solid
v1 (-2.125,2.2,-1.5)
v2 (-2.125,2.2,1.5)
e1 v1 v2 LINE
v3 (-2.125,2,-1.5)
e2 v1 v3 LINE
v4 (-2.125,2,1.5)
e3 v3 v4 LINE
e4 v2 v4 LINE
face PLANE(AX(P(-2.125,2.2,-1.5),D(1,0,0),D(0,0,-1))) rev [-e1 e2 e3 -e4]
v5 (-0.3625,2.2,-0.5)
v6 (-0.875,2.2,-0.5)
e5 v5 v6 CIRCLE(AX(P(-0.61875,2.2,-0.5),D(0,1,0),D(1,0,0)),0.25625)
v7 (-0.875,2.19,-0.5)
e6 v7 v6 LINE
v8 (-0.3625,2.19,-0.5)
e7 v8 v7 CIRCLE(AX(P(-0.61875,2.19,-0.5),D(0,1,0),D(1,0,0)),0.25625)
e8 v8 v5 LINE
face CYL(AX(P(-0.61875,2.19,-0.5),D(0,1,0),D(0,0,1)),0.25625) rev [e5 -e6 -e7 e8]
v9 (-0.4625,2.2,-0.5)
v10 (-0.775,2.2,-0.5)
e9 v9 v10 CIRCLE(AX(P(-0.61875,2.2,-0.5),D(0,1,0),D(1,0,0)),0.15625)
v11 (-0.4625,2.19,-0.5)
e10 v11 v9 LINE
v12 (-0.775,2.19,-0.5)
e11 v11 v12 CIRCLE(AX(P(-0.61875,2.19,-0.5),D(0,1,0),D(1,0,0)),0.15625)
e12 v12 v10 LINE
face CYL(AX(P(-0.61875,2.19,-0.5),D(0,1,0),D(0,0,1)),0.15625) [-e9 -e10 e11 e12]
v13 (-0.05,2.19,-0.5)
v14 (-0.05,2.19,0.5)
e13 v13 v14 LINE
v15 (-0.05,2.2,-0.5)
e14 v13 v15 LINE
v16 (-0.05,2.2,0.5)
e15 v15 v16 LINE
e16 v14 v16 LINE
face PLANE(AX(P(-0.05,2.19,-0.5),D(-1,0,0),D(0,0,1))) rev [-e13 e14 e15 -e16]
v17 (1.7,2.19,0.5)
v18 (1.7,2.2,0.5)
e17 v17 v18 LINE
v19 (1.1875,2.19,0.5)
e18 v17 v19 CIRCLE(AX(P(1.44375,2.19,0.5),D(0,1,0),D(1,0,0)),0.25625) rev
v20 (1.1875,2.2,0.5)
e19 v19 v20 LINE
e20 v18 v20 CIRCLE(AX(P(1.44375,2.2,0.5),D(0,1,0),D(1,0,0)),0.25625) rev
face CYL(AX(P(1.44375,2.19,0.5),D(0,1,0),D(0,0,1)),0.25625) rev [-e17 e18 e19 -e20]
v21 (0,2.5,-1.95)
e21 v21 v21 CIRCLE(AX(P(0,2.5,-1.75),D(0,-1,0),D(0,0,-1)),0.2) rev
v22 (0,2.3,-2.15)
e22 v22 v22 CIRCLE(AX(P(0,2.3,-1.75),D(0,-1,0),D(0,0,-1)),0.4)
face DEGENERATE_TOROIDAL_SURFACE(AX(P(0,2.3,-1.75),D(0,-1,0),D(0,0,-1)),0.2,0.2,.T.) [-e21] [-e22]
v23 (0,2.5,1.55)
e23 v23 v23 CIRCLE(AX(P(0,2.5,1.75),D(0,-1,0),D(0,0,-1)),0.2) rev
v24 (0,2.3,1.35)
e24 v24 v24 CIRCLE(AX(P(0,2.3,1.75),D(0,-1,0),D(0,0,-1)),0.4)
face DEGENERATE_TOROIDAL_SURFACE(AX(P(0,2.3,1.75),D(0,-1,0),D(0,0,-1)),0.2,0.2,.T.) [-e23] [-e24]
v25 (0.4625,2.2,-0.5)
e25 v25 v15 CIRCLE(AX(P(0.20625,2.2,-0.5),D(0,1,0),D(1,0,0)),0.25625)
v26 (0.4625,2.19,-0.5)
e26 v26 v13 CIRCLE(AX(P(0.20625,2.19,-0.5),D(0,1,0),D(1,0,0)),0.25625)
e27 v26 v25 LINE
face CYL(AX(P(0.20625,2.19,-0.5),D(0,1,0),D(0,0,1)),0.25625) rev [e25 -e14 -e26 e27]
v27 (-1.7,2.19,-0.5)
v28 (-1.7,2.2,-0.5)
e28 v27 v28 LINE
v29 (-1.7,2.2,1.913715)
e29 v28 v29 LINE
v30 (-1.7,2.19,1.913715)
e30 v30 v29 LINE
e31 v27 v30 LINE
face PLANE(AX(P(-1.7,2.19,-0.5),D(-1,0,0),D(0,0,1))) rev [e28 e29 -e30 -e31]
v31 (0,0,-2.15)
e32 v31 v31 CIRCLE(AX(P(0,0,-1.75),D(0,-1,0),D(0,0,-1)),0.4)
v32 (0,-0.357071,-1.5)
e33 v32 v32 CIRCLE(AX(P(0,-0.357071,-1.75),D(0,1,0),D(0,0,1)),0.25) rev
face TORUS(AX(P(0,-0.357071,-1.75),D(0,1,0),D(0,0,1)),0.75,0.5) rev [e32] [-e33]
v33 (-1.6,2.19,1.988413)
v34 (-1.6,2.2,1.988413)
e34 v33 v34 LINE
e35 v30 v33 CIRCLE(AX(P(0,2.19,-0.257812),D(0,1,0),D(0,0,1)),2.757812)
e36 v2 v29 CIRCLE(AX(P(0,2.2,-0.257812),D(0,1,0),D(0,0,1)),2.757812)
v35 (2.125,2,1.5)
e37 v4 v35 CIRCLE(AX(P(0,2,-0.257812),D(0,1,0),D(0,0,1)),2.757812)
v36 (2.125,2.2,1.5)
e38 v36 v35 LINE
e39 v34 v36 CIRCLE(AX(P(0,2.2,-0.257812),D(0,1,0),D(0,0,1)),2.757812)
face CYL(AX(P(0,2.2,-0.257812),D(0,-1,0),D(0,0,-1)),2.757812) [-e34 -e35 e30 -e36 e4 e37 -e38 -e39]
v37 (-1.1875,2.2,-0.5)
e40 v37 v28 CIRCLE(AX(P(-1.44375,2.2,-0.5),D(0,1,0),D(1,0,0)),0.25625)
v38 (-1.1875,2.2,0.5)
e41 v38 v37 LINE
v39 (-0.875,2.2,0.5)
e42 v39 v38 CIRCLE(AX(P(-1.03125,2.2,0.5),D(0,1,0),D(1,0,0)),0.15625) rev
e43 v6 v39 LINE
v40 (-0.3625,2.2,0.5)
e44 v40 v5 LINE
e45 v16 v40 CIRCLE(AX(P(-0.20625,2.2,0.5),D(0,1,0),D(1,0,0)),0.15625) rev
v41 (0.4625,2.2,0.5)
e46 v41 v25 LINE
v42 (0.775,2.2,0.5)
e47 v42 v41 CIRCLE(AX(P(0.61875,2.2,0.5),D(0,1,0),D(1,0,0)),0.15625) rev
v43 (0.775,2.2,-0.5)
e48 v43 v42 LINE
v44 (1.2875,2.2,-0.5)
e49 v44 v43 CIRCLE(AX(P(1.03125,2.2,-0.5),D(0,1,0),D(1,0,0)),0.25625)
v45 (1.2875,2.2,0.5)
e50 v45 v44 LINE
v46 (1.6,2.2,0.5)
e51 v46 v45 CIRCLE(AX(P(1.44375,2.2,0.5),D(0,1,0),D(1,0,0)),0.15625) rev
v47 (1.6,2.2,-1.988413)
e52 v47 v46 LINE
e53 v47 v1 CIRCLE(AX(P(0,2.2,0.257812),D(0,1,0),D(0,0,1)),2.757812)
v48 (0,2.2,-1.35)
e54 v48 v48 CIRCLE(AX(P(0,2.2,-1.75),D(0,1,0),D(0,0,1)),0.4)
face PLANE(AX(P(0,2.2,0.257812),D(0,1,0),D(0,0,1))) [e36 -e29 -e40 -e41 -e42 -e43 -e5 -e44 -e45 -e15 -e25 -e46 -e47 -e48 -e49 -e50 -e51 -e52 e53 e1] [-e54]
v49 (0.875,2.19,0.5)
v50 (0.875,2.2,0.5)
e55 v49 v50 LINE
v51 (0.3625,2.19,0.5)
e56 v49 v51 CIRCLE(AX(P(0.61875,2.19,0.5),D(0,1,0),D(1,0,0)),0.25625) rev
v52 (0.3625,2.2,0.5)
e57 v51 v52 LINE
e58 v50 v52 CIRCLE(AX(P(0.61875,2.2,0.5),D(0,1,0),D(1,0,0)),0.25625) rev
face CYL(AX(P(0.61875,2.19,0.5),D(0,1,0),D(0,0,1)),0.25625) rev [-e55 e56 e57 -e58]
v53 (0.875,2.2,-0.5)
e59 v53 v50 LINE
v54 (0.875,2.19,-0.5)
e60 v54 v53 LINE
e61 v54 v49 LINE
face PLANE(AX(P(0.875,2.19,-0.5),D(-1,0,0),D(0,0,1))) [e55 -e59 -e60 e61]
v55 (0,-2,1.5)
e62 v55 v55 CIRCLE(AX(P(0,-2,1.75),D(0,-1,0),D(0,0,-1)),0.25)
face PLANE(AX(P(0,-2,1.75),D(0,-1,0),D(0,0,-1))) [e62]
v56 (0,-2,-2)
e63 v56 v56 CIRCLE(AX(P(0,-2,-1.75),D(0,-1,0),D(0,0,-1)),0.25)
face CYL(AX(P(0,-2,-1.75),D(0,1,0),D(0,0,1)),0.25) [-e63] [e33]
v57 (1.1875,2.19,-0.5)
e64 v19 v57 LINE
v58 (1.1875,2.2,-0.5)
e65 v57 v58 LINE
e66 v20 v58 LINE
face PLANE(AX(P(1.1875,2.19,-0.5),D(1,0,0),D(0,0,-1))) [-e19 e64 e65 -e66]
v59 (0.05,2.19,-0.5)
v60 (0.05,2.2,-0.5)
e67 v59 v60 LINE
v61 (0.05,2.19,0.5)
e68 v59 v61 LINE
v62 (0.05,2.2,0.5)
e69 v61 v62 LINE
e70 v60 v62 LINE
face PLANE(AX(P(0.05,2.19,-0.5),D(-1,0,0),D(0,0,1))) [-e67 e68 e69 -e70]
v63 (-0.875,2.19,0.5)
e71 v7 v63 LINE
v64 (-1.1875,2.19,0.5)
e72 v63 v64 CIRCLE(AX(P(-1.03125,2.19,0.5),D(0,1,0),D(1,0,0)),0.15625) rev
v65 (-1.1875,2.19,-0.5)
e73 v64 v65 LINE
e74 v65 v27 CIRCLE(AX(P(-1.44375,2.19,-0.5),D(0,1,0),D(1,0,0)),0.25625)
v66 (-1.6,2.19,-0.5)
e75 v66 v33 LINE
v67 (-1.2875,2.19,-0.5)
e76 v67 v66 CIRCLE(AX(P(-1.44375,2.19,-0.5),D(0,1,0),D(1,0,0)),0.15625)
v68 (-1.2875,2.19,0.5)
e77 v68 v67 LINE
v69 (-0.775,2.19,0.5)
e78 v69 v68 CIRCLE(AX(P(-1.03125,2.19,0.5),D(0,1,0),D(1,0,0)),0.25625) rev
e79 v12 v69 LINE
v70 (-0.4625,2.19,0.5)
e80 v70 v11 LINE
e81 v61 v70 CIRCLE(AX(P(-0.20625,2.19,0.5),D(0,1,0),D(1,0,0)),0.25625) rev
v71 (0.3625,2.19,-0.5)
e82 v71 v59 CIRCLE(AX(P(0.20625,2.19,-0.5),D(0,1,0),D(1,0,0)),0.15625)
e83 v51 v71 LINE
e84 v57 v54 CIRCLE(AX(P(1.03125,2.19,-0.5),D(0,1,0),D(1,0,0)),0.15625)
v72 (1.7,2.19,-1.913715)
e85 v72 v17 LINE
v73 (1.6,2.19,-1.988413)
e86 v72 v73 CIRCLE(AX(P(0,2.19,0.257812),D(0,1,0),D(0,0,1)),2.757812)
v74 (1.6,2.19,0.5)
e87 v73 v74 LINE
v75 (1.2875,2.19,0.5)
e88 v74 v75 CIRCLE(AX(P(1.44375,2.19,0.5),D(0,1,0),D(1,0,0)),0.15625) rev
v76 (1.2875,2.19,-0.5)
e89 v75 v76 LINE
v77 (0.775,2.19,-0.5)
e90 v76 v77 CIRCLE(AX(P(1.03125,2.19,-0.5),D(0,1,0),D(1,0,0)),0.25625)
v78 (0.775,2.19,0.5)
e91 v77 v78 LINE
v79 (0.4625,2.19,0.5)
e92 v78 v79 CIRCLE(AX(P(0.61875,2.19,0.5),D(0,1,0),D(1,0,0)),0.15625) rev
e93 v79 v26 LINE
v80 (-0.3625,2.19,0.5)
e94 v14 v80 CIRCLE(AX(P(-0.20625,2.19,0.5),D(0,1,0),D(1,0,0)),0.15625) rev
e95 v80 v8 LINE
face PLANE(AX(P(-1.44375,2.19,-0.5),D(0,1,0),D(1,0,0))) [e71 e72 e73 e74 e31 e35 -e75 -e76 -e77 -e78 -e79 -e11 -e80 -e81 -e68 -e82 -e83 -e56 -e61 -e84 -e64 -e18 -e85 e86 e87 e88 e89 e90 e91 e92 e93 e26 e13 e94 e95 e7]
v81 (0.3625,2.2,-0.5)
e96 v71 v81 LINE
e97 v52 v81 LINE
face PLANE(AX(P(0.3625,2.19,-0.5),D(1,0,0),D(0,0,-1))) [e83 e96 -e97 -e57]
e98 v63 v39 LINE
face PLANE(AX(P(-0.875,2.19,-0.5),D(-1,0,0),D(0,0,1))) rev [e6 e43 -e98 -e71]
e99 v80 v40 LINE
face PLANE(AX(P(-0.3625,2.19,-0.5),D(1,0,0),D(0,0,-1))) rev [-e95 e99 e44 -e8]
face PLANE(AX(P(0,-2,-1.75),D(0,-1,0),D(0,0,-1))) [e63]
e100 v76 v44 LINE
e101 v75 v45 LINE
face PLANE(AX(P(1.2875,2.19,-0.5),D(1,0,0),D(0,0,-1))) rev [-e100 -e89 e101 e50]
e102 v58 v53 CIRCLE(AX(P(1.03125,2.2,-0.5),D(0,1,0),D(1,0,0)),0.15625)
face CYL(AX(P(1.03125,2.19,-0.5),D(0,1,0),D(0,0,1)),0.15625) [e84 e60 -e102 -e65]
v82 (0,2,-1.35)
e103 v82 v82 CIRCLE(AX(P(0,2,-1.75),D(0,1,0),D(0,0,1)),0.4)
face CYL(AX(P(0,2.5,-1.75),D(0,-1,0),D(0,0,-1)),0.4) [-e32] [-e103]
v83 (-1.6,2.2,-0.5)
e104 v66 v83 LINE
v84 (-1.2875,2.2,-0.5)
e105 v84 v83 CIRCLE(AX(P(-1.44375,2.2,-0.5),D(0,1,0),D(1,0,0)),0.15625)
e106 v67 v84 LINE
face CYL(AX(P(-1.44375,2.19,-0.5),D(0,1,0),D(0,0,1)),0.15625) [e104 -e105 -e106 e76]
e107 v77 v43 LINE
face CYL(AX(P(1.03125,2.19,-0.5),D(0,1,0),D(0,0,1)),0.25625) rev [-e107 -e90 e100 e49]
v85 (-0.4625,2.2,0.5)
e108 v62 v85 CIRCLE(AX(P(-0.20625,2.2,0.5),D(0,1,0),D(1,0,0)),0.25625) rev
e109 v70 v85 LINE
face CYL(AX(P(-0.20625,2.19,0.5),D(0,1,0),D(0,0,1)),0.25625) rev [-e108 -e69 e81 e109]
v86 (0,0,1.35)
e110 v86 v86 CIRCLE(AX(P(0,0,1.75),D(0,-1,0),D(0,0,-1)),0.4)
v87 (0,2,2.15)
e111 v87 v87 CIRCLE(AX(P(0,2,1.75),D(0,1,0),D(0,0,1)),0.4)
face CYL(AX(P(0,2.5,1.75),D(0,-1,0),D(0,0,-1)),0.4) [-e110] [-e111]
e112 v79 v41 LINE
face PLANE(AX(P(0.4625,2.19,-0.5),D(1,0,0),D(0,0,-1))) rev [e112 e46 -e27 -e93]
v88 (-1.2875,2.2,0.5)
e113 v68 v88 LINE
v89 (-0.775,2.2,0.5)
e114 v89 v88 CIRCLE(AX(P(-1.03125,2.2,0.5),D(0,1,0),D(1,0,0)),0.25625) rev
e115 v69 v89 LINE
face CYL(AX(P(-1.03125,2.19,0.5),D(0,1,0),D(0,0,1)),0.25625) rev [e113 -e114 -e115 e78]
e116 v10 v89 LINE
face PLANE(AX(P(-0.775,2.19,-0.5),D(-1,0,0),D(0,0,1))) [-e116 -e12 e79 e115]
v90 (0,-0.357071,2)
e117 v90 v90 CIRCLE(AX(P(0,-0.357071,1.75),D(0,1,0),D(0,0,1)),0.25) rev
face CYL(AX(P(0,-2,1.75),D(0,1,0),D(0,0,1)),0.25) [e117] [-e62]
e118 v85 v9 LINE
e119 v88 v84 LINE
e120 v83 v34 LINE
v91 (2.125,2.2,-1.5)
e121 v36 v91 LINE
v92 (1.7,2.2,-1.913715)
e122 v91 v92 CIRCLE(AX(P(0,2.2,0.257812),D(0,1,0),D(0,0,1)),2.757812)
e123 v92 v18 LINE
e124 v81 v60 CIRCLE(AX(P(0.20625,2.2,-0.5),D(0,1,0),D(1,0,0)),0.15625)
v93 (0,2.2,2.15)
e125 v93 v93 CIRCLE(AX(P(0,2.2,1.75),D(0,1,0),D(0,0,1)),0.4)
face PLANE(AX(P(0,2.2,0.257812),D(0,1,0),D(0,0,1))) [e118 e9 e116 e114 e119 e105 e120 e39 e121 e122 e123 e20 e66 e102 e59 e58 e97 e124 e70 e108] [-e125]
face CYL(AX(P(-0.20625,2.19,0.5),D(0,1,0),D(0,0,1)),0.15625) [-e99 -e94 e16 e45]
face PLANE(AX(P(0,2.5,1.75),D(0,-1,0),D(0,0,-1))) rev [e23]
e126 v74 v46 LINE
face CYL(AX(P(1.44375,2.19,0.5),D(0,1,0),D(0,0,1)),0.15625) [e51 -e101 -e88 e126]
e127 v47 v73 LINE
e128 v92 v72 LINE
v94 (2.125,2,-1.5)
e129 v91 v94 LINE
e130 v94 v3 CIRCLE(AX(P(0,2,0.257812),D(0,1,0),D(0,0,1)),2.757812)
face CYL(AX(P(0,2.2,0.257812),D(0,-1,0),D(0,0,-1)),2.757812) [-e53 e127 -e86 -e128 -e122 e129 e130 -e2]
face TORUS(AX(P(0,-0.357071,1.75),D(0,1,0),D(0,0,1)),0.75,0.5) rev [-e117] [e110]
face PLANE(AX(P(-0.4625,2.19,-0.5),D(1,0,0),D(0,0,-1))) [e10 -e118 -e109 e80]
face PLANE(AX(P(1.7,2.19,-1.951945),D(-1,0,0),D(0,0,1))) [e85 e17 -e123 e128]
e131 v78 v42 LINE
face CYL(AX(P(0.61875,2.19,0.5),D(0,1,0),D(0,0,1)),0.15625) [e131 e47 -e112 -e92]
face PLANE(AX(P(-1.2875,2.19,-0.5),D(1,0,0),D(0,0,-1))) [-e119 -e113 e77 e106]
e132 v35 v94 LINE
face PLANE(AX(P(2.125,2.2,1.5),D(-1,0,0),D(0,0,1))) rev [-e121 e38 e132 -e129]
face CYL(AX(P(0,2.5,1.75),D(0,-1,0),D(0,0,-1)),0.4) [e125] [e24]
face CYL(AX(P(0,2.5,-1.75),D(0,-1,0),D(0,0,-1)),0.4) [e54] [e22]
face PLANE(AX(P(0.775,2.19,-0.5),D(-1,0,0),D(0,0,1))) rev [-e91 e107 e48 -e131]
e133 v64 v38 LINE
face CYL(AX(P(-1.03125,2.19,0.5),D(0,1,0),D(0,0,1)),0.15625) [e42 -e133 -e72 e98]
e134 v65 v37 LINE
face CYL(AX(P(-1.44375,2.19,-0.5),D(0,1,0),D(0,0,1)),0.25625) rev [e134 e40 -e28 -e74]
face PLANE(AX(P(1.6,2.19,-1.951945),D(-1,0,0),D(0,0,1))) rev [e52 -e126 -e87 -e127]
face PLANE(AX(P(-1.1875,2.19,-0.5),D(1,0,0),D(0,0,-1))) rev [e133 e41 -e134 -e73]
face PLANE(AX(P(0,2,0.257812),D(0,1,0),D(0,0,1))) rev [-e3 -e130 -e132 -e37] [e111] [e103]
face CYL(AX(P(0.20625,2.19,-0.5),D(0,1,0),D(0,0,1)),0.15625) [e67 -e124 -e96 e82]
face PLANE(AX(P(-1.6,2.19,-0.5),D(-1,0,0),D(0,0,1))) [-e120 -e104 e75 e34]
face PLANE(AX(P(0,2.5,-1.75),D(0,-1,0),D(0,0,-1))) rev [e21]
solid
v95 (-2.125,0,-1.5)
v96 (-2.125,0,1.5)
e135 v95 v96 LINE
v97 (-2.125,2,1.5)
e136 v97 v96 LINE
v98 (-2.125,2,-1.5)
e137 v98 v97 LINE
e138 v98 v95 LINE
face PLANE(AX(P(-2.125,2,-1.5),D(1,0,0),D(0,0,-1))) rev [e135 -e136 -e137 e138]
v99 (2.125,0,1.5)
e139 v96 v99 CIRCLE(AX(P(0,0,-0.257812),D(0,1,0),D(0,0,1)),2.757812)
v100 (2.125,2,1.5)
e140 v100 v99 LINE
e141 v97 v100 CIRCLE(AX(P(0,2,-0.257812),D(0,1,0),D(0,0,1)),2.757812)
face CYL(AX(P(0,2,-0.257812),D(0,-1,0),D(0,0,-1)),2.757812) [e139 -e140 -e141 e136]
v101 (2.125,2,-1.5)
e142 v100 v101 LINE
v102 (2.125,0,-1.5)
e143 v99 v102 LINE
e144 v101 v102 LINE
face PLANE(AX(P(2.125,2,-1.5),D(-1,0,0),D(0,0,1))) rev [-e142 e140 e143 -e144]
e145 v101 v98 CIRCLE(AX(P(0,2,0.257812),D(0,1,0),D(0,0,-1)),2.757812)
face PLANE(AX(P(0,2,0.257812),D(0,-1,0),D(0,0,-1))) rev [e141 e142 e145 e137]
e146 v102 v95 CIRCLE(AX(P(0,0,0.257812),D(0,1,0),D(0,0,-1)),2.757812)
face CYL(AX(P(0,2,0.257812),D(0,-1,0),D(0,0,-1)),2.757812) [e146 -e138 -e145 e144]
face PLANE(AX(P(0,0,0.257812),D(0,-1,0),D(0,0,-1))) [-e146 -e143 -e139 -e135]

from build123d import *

# Parameters (mm, degrees)
BOSS_EXTRUDE1_DEPTH     = 2
BOSS_EXTRUDE2_DEPTH     = 0.2
SKETCH3_R               = 0.4
BOSS_EXTRUDE4_DEPTH     = 2.5
SKETCH4_R               = 0.25
BOSS_EXTRUDE5_DEPTH     = 2
FILLET1_R               = 0.5
FILLET2_R               = 0.2
CUT_EXTRUDE_THIN1_DEPTH = 0.01


with BuildPart() as part:
    # Sketch1 → Boss-Extrude1 (new body)
    with BuildSketch(Plane(origin=(0, 0, 0), x_dir=(1, 0, 0), z_dir=(0, 1, 0))):
        with BuildLine():
            Line((-2.125, 1.5), (-2.125, -1.5))
            ThreePointArc((-2.125, -1.5), (0, -2.5), (2.125, -1.5))
            Line((2.125, -1.5), (2.125, 1.5))
            ThreePointArc((2.125, 1.5), (0, 2.5), (-2.125, 1.5))
        make_face()
    extrude(amount=BOSS_EXTRUDE1_DEPTH)


with BuildPart() as body_2:
    # Sketch2 → Boss-Extrude2 (new body)
    with BuildSketch(Plane(origin=(0, 2, 0), x_dir=(1, 0, 0), z_dir=(0, 1, 0))):
        with BuildLine():
            Line((-2.125, 1.5), (-2.125, -1.5))
            ThreePointArc((-2.125, -1.5), (0, -2.5), (2.125, -1.5))
            Line((2.125, -1.5), (2.125, 1.5))
            ThreePointArc((2.125, 1.5), (0, 2.5), (-2.125, 1.5))
        make_face()
    extrude(amount=BOSS_EXTRUDE2_DEPTH)

    # Sketch3 → Boss-Extrude4 (add)
    with BuildSketch(Plane.XZ):
        with Locations(Location((0, 1.75, 0), (0, 0, 270))):
            Circle(SKETCH3_R)
        with Locations(Location((0, -1.75, 0), (0, 0, 270))):
            Circle(SKETCH3_R)
    extrude(amount=-BOSS_EXTRUDE4_DEPTH)

    # Sketch4 → Boss-Extrude5 (add)
    with BuildSketch(Plane.XZ):
        with Locations(Location((0, 1.75, 0), (0, 0, 270))):
            Circle(SKETCH4_R)
        with Locations(Location((0, -1.75, 0), (0, 0, 270))):
            Circle(SKETCH4_R)
    extrude(amount=BOSS_EXTRUDE5_DEPTH)

    # Fillet1
    # the kernel refuses this fillet: 0.5 mm, written as the material it adds along each edge
    with BuildSketch(Plane(origin=(0, 0, 1.75), x_dir=(0, 0, -1), z_dir=(-1, 0, 0))) as fillet1_piece_1:
        with BuildLine():
            CenterArc((0.75, 0.357071421), FILLET1_R, 180, 45.572995999)
            Line((0.25, 0.357071421), (0.24, 0.357071421))
            Line((0.24, 0.357071421), (0.24, 0))
            Line((0.24, 0), (0.25, -0.01))
            ThreePointArc((0.25, -0.01), (0.325, -0.01), (0.393, -0.007141428))
            Line((0.393, -0.007141428), (0.4, 0))
        make_face()
    revolve(axis=Axis((0, 0, 1.75), (0, -1, 0)))
    with BuildSketch(Plane(origin=(0, 0, -1.75), x_dir=(0, 0, -1), z_dir=(-1, 0, 0))) as fillet1_piece_2:
        with BuildLine():
            CenterArc((0.75, 0.357071421), FILLET1_R, 180, 45.572995999)
            Line((0.25, 0.357071421), (0.24, 0.357071421))
            Line((0.24, 0.357071421), (0.24, 0))
            Line((0.24, 0), (0.25, -0.01))
            ThreePointArc((0.25, -0.01), (0.325, -0.01), (0.393, -0.007141428))
            Line((0.393, -0.007141428), (0.4, 0))
        make_face()
    revolve(axis=Axis((0, 0, -1.75), (0, -1, 0)))

    # Fillet2
    fillet2_edges = [body_2.edges().sort_by_distance(p)[0] for p in [
        (0, 2.5, 2.15),
        (0, 2.5, -1.35),
    ]]
    fillet(fillet2_edges, radius=FILLET2_R)

    # Sketch5 → Cut-Extrude-Thin1 (cut)
    with BuildSketch(Plane(origin=(0, 2.2, 0), x_dir=(1, 0, 0), z_dir=(0, 1, 0))):
        with BuildLine():
            Line((1.6, 2.5), (1.6, 1.951945357))
            Line((1.6, 1.951945357), (1.6, -0.5))
            ThreePointArc((1.6, -0.5), (1.44375, -0.65625), (1.2875, -0.5))
            Line((1.2875, -0.5), (1.2875, 0.5))
            ThreePointArc((1.2875, 0.5), (1.03125, 0.75625), (0.775, 0.5))
            Line((0.775, 0.5), (0.775, -0.5))
            ThreePointArc((0.775, -0.5), (0.61875, -0.65625), (0.4625, -0.5))
            Line((0.4625, -0.5), (0.4625, 0.5))
            ThreePointArc((0.4625, 0.5), (0.20625, 0.75625), (-0.05, 0.5))
            Line((-0.05, 0.5), (-0.05, -0.5))
            ThreePointArc((-0.05, -0.5), (-0.20625, -0.65625), (-0.3625, -0.5))
            Line((-0.3625, -0.5), (-0.3625, 0.5))
            ThreePointArc((-0.3625, 0.5), (-0.61875, 0.75625), (-0.875, 0.5))
            Line((-0.875, 0.5), (-0.875, -0.5))
            ThreePointArc((-0.875, -0.5), (-1.03125, -0.65625), (-1.1875, -0.5))
            Line((-1.1875, -0.5), (-1.1875, 0.5))
            ThreePointArc((-1.1875, 0.5), (-1.44375, 0.75625), (-1.7, 0.5))
            Line((-1.7, 0.5), (-1.7, -1.951945357))
            Line((-1.7, -1.951945357), (-1.7, -2.5))
            Line((-1.7, -2.5), (-1.6, -2.5))
            Line((-1.6, -2.5), (-1.6, -1.951945357))
            Line((-1.6, -1.951945357), (-1.6, 0.5))
            ThreePointArc((-1.6, 0.5), (-1.44375, 0.65625), (-1.2875, 0.5))
            Line((-1.2875, 0.5), (-1.2875, -0.5))
            ThreePointArc((-1.2875, -0.5), (-1.03125, -0.75625), (-0.775, -0.5))
            Line((-0.775, -0.5), (-0.775, 0.5))
            ThreePointArc((-0.775, 0.5), (-0.61875, 0.65625), (-0.4625, 0.5))
            Line((-0.4625, 0.5), (-0.4625, -0.5))
            ThreePointArc((-0.4625, -0.5), (-0.20625, -0.75625), (0.05, -0.5))
            Line((0.05, -0.5), (0.05, 0.5))
            ThreePointArc((0.05, 0.5), (0.20625, 0.65625), (0.3625, 0.5))
            Line((0.3625, 0.5), (0.3625, -0.5))
            ThreePointArc((0.3625, -0.5), (0.61875, -0.75625), (0.875, -0.5))
            Line((0.875, -0.5), (0.875, 0.5))
            ThreePointArc((0.875, 0.5), (1.03125, 0.65625), (1.1875, 0.5))
            Line((1.1875, 0.5), (1.1875, -0.5))
            ThreePointArc((1.1875, -0.5), (1.44375, -0.75625), (1.7, -0.5))
            Line((1.7, -0.5), (1.7, 1.951945357))
            Line((1.7, 1.951945357), (1.7, 2.5))
            Line((1.7, 2.5), (1.6, 2.5))
        make_face()
    extrude(amount=-CUT_EXTRUDE_THIN1_DEPTH, mode=Mode.SUBTRACT)


solid = Compound([part.part, body_2.part])
